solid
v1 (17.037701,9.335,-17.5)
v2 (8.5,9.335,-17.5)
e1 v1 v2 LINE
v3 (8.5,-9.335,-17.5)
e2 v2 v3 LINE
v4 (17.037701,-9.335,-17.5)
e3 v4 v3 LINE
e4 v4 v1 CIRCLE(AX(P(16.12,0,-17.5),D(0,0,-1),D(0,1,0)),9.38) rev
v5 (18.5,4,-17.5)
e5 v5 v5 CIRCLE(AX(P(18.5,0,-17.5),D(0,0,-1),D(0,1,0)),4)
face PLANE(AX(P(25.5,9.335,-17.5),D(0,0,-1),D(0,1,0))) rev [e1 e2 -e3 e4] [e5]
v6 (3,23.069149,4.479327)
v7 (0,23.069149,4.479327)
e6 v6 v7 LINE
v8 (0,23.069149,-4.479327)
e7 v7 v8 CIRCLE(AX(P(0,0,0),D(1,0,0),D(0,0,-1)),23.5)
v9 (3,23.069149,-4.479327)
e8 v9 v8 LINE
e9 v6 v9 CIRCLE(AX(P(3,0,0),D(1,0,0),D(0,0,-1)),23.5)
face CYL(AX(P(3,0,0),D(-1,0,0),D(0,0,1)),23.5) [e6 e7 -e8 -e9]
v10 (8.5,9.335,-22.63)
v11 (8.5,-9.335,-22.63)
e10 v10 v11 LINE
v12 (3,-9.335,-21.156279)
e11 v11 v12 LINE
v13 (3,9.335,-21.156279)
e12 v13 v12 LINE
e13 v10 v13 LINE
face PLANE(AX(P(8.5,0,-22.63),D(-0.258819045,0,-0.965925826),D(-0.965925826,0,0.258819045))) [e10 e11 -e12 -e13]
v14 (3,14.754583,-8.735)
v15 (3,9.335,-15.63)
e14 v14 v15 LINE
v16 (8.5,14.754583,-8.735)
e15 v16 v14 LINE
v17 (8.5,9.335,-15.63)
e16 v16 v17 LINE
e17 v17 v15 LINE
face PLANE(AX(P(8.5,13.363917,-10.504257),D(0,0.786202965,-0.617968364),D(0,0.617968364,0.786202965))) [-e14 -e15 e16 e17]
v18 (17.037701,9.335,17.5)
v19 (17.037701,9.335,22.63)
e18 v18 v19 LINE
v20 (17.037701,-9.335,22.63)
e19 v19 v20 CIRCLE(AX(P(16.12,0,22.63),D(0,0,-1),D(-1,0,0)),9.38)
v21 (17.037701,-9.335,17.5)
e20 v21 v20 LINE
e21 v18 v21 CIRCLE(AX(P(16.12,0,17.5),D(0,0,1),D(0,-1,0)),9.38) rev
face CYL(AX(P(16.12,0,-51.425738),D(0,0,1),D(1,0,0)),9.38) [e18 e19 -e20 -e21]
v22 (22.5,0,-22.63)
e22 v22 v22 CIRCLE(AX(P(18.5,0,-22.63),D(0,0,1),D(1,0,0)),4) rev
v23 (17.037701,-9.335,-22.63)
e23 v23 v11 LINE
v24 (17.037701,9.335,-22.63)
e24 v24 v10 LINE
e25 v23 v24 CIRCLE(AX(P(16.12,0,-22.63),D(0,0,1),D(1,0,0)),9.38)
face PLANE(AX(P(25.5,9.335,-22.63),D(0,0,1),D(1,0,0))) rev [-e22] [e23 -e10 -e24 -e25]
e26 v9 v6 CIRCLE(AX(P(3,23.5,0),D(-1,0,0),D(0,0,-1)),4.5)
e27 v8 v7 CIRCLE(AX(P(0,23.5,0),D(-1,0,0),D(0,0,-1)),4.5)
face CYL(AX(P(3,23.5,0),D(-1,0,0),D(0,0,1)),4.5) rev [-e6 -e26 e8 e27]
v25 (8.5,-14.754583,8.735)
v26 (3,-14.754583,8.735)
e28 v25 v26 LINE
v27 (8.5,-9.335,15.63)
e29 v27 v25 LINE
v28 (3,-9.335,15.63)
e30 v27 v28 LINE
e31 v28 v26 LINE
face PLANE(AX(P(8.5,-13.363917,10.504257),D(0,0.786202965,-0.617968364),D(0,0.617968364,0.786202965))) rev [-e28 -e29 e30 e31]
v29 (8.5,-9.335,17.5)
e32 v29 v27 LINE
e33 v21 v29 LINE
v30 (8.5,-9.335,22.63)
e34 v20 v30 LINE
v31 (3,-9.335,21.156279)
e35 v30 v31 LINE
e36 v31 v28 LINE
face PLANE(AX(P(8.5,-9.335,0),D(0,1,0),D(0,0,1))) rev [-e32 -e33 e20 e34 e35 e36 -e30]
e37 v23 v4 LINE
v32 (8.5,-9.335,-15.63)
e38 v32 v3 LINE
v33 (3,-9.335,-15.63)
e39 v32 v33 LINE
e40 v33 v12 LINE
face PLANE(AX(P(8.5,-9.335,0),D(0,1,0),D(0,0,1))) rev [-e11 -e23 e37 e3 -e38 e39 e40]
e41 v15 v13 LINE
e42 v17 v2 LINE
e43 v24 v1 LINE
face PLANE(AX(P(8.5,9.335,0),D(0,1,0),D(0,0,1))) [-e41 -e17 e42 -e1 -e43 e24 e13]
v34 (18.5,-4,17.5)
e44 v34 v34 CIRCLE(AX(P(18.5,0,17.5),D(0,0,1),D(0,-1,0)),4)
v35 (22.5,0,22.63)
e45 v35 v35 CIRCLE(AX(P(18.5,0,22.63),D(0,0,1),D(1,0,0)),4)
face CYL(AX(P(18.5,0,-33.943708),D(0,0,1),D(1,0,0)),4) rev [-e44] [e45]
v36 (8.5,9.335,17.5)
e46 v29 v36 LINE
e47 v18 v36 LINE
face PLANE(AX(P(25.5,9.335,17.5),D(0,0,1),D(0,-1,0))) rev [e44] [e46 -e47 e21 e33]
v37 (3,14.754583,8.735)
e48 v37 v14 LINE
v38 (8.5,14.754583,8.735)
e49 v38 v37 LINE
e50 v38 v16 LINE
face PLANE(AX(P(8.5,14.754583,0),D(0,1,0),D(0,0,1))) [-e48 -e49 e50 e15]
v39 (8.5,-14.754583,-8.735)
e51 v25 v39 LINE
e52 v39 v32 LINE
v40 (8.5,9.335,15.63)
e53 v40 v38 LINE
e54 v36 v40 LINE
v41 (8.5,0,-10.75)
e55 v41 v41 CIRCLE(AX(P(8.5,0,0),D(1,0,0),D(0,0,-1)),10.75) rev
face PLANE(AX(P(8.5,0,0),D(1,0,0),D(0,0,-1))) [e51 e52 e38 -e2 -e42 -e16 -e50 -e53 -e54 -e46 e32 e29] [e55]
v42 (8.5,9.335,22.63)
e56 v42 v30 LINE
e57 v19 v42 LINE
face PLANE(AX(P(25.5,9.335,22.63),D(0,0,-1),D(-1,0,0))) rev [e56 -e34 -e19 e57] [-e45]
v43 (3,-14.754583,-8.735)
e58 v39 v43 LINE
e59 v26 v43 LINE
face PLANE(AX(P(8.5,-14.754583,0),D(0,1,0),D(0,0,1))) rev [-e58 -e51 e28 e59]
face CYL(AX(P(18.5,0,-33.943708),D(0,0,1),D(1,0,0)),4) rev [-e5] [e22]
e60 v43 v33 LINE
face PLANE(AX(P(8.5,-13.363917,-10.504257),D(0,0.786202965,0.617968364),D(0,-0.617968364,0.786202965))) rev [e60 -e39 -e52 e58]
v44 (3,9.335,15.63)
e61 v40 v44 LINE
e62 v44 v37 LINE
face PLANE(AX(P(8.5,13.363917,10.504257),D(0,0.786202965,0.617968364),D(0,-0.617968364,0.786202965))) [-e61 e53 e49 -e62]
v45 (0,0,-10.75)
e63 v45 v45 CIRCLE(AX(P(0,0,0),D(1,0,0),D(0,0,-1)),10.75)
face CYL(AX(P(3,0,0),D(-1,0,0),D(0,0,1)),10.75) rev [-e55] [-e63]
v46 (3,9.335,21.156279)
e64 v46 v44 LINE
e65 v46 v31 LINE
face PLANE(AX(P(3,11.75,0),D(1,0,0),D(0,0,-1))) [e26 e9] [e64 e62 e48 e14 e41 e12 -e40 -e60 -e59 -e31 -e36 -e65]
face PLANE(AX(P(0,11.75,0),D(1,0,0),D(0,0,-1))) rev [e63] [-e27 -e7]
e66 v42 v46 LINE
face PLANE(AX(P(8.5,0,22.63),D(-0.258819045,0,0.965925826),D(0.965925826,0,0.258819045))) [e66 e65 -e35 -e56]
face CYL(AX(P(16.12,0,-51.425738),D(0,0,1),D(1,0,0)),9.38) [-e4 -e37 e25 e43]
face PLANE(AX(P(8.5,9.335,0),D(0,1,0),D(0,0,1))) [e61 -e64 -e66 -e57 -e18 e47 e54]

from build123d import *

# Parameters (mm, degrees)
SKETCH1_R           = 10.75
BOSS_EXTRUDE1_DEPTH = 3
SKETCH2_R           = 10.75
BOSS_EXTRUDE2_DEPTH = 5.5
DRAFT1_START        = -9.335
DRAFT1_DEPTH        = 18.67
SKETCH3_W           = 5.13
SKETCH3_H           = 18.67
BOSS_EXTRUDE3_DEPTH = 17
CUT_EXTRUDE1_REACH  = 59.71
CUT_EXTRUDE2_REACH  = 59.71
SKETCH5_R           = 4


# Read off the part's stored shape, not the designer's step: Draft1
with BuildPart() as part:
    # Sketch1 → Boss-Extrude1 (new body)
    with BuildSketch(Plane(origin=(0, 0, 0), x_dir=(0, 0, -1), z_dir=(1, 0, 0))):
        with BuildLine():
            ThreePointArc((-4.479326664, 23.069148936), (0, -23.5), (4.479326664, 23.069148936))
            ThreePointArc((4.479326664, 23.069148936), (0, 19), (-4.479326664, 23.069148936))
        make_face()
        Circle(SKETCH1_R, mode=Mode.SUBTRACT)
    extrude(amount=BOSS_EXTRUDE1_DEPTH)

    # Sketch2 → Boss-Extrude2 (add)
    # profile 1 of 7: a face of its own
    with BuildSketch(Plane(origin=(3, 0, 0), x_dir=(0, 0, -1), z_dir=(1, 0, 0))):
        with BuildLine():
            ThreePointArc((-22.63, 6.33506906), (-22.149027068, 7.853063093), (-21.566357481, 9.335))
            Line((-21.566357481, 9.335), (-22.63, 9.335))
            Line((-22.63, 9.335), (-22.63, 6.33506906))
        make_face()
    # profile 2 of 7: a face of its own
    with BuildSketch(Plane(origin=(3, 0, 0), x_dir=(0, 0, -1), z_dir=(1, 0, 0))):
        with BuildLine():
            Line((-15.63, -9.335), (-15.63, 9.335))
            Line((-15.63, 9.335), (-21.566357481, 9.335))
            ThreePointArc((-21.566357481, 9.335), (-22.149027068, 7.853063093), (-22.63, 6.33506906))
            Line((-22.63, 6.33506906), (-22.63, -6.33506906))
            ThreePointArc((-22.63, -6.33506906), (-22.149027068, -7.853063093), (-21.566357481, -9.335))
            Line((-21.566357481, -9.335), (-15.63, -9.335))
        make_face()
    # profile 3 of 7: a face of its own
    with BuildSketch(Plane(origin=(3, 0, 0), x_dir=(0, 0, -1), z_dir=(1, 0, 0))):
        with BuildLine():
            Line((-22.63, -9.335), (-21.566357481, -9.335))
            ThreePointArc((-21.566357481, -9.335), (-22.149027068, -7.853063093), (-22.63, -6.33506906))
            Line((-22.63, -6.33506906), (-22.63, -9.335))
        make_face()
    # profile 4 of 7: a face of its own
    with BuildSketch(Plane(origin=(3, 0, 0), x_dir=(0, 0, -1), z_dir=(1, 0, 0))):
        Polygon((-8.735, -14.754582548), (8.735, -14.754582548), (15.63, -9.335), (15.63, 9.335), (8.735, 14.754582548), (-8.735, 14.754582548), (-15.63, 9.335), (-15.63, -9.335), align=None)
        Circle(SKETCH2_R, mode=Mode.SUBTRACT)
    # profile 5 of 7: a face of its own
    with BuildSketch(Plane(origin=(3, 0, 0), x_dir=(0, 0, -1), z_dir=(1, 0, 0))):
        with BuildLine():
            Line((21.566357481, 9.335), (15.63, 9.335))
            Line((15.63, 9.335), (15.63, -9.335))
            Line((15.63, -9.335), (21.566357481, -9.335))
            ThreePointArc((21.566357481, -9.335), (22.149027068, -7.853063093), (22.63, -6.33506906))
            Line((22.63, -6.33506906), (22.63, 6.33506906))
            ThreePointArc((22.63, 6.33506906), (22.149027068, 7.853063093), (21.566357481, 9.335))
        make_face()
    # profile 6 of 7: a face of its own
    with BuildSketch(Plane(origin=(3, 0, 0), x_dir=(0, 0, -1), z_dir=(1, 0, 0))):
        with BuildLine():
            ThreePointArc((22.63, -6.33506906), (22.149027068, -7.853063093), (21.566357481, -9.335))
            Line((21.566357481, -9.335), (22.63, -9.335))
            Line((22.63, -9.335), (22.63, -6.33506906))
        make_face()
    # profile 7 of 7: a face of its own
    with BuildSketch(Plane(origin=(3, 0, 0), x_dir=(0, 0, -1), z_dir=(1, 0, 0))):
        with BuildLine():
            Line((22.63, 9.335), (21.566357481, 9.335))
            ThreePointArc((21.566357481, 9.335), (22.149027068, 7.853063093), (22.63, 6.33506906))
            Line((22.63, 6.33506906), (22.63, 9.335))
        make_face()
    extrude(amount=BOSS_EXTRUDE2_DEPTH)

    # Draft1 outline → Draft1 (cut)
    with BuildSketch(Plane(origin=(0, 0, 0), x_dir=(1, 0, 0), z_dir=(0, 1, 0)).offset(DRAFT1_START)):
        Polygon((3, 22.63), (3, 21.156279442), (8.5, 22.63), align=None)
        Polygon((3, -21.156279442), (3, -22.63), (8.5, -22.63), align=None)
    extrude(amount=DRAFT1_DEPTH, mode=Mode.SUBTRACT)

    # Sketch3 → Boss-Extrude3 (add)
    with BuildSketch(Plane(origin=(8.5, 0, 0), x_dir=(0, 0, -1), z_dir=(1, 0, 0))):
        with Locations((-20.065, 0)):
            Rectangle(SKETCH3_W, SKETCH3_H)
        with Locations((20.065, 0)):
            Rectangle(SKETCH3_W, SKETCH3_H)
    extrude(amount=BOSS_EXTRUDE3_DEPTH)

    # Cut-Extrude1: up to this face of the body (flat: up to its plane)
    cut_extrude1_end = Plane(part.part.faces().sort_by_distance((17, 0, -22.63))[0])
    # Sketch4 → Cut-Extrude1 (cut, up to the picked face)
    with BuildSketch(Plane.XY.offset(22.63), mode=Mode.PRIVATE) as cut_extrude1_sk1:
        with BuildLine():
            Line((17.037700932, 12.875), (29.477700932, 12.875))
            Line((29.477700932, 12.875), (29.477700932, -13.095))
            Line((29.477700932, -13.095), (17.037700932, -13.095))
            Line((17.037700932, -13.095), (17.037700932, -9.335))
            ThreePointArc((17.037700932, -9.335), (25.5, 0), (17.037700932, 9.335))
            Line((17.037700932, 9.335), (17.037700932, 12.875))
        make_face()
    cut_extrude1_tool1 = split(extrude(cut_extrude1_sk1.sketch, amount=-CUT_EXTRUDE1_REACH, mode=Mode.PRIVATE), bisect_by=cut_extrude1_end, keep=Keep.BOTH, mode=Mode.PRIVATE)
    add(cut_extrude1_tool1.solids().sort_by(Axis((17.325658, 11.105, 22.63), (0, 0, -1)))[0], mode=Mode.SUBTRACT)

    # Cut-Extrude2: up to this face of the body (flat: up to its plane)
    cut_extrude2_end = Plane(part.part.faces().sort_by_distance((16.149048437, 0, -22.63))[0])
    # Sketch5 → Cut-Extrude2 (cut, up to the picked face)
    with BuildSketch(Plane.XY.offset(22.63), mode=Mode.PRIVATE) as cut_extrude2_sk1:
        with Locations((18.5, 0)):
            Circle(SKETCH5_R)
    cut_extrude2_tool1 = split(extrude(cut_extrude2_sk1.sketch, amount=-CUT_EXTRUDE2_REACH, mode=Mode.PRIVATE), bisect_by=cut_extrude2_end, keep=Keep.BOTH, mode=Mode.PRIVATE)
    add(cut_extrude2_tool1.solids().sort_by(Axis((18.5, 0, 22.63), (0, 0, -1)))[0], mode=Mode.SUBTRACT)


solid = part.part
